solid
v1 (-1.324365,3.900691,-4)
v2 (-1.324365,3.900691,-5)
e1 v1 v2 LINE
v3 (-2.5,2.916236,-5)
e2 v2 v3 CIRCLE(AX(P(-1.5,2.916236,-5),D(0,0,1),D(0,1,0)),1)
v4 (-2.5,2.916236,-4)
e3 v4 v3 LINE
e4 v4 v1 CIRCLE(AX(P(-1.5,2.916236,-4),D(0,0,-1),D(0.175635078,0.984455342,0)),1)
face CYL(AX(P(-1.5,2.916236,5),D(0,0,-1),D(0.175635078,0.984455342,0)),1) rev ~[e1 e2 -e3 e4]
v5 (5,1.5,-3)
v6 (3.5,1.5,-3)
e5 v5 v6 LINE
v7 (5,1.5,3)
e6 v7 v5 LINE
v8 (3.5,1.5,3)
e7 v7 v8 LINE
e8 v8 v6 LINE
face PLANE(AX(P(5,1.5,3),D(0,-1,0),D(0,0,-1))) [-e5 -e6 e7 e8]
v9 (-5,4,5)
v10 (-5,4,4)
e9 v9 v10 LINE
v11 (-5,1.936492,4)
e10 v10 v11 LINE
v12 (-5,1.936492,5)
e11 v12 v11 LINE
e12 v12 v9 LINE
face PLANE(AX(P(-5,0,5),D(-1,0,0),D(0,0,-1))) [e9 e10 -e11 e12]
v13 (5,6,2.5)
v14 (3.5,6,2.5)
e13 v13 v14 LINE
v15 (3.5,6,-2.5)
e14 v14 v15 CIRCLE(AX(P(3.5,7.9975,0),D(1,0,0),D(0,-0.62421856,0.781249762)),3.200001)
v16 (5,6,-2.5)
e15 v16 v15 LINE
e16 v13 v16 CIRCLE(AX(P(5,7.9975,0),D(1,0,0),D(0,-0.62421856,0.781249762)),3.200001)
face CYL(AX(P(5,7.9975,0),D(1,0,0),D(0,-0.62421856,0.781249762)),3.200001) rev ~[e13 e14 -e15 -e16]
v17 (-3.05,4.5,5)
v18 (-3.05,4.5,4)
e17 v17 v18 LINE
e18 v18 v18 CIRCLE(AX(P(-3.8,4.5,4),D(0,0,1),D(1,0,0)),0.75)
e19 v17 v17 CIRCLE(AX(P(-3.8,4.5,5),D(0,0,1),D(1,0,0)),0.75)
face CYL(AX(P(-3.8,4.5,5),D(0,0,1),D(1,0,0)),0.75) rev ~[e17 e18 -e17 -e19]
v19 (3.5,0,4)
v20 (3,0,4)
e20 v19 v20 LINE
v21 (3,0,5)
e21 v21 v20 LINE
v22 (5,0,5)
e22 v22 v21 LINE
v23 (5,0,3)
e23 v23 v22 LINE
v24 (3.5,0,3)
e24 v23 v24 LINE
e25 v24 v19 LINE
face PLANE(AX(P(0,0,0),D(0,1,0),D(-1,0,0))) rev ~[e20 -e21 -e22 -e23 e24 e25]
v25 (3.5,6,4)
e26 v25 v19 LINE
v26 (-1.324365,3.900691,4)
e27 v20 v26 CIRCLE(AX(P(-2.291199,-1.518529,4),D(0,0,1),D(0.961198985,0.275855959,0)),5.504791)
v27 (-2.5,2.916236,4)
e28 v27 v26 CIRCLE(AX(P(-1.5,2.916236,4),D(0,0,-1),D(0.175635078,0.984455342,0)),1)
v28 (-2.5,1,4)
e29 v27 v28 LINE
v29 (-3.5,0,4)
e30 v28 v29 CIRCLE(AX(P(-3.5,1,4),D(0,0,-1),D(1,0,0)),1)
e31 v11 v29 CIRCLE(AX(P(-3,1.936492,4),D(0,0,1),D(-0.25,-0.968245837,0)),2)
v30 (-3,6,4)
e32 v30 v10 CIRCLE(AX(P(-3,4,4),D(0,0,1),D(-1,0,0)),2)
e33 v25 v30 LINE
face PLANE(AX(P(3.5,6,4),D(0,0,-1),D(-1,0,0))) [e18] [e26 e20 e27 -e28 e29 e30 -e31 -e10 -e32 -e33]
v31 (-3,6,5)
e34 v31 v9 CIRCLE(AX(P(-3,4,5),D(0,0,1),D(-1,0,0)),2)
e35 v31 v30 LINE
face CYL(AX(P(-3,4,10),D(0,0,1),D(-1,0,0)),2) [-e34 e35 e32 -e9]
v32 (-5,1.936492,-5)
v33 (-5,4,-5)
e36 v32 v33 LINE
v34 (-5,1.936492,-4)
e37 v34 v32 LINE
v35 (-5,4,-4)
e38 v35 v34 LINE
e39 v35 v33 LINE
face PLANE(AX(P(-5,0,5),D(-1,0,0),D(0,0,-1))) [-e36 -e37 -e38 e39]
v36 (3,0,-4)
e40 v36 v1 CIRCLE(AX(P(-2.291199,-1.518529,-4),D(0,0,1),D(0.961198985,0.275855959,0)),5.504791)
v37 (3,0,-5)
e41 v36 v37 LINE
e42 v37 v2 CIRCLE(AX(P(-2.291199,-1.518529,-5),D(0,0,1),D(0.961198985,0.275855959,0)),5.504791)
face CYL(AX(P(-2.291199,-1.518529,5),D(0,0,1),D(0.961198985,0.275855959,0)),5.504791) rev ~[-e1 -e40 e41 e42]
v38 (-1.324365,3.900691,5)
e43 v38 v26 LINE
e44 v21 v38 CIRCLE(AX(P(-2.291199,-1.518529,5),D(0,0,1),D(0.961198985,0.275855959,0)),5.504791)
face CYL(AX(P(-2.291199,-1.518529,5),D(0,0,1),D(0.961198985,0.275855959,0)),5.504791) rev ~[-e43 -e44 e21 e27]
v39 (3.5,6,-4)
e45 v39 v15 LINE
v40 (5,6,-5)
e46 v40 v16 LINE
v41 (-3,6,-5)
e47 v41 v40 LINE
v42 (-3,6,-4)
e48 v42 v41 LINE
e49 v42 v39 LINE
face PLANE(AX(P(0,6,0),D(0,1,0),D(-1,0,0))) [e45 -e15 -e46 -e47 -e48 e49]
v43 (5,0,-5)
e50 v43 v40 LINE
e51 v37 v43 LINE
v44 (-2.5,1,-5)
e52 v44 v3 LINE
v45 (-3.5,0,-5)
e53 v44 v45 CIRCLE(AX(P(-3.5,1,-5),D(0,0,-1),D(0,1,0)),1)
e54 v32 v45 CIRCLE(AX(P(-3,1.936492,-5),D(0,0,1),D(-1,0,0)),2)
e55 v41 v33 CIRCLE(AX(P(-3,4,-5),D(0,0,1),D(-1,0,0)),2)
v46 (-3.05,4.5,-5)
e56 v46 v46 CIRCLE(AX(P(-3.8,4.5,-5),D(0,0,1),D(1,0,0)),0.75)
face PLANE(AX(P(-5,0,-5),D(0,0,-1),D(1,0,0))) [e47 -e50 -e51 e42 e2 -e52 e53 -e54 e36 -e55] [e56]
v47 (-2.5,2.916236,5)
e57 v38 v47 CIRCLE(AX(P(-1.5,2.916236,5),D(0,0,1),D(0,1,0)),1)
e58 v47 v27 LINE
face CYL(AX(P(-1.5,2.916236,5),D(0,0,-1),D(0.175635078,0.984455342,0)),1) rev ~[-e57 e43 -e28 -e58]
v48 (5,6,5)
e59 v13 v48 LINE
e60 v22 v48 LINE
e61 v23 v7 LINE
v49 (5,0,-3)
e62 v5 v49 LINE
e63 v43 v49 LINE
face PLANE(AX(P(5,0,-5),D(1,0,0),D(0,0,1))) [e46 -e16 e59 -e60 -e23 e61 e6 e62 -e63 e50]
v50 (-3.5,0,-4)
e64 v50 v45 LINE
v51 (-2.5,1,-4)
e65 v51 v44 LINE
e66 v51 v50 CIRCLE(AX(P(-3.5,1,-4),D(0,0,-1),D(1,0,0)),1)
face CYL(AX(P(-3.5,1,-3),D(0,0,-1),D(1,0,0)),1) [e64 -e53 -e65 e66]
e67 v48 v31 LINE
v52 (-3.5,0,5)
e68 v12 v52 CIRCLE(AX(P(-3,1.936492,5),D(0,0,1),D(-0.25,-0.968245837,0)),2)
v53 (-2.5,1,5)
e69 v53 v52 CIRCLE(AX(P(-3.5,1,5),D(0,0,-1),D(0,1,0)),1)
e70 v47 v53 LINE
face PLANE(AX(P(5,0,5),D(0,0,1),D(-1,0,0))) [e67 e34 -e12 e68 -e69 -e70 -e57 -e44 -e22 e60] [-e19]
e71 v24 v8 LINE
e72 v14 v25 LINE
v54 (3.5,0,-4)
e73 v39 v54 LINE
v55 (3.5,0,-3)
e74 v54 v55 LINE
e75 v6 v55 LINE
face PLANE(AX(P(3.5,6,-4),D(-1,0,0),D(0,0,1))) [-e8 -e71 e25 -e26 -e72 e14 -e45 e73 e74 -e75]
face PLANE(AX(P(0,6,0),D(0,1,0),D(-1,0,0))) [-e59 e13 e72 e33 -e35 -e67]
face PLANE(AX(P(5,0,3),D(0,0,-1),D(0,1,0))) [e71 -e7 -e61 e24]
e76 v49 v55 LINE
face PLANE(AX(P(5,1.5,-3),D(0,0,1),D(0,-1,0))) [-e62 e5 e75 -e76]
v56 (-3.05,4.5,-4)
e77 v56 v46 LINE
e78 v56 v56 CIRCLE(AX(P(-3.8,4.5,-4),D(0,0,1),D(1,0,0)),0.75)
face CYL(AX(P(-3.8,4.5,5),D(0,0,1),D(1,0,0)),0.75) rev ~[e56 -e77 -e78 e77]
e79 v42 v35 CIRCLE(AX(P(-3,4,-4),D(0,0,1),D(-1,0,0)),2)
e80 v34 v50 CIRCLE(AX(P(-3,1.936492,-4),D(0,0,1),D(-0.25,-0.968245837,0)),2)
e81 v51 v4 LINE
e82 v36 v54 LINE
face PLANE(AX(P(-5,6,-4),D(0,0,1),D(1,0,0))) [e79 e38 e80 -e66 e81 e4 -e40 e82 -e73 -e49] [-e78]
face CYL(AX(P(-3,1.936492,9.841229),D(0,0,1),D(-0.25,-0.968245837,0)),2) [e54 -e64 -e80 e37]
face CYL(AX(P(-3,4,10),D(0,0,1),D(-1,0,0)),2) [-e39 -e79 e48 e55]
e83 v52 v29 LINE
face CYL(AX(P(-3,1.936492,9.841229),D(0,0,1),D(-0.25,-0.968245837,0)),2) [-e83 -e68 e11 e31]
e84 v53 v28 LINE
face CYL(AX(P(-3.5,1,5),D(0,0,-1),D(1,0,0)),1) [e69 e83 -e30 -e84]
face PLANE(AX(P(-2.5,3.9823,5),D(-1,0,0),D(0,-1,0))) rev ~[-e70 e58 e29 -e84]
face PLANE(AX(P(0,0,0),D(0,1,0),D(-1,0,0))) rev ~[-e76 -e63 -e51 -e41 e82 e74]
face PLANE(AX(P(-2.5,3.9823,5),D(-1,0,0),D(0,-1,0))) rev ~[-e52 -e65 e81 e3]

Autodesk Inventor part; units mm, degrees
ref_plane "YZ Plane" through (0, 0, 0) normal (1, 0, 0) x (0, 1, 0)
ref_plane "XZ Plane" through (0, 0, 0) normal (0, 1, 0) x (-1, 0, 0)
ref_plane "XY Plane" through (0, 0, 0) normal (0, 0, 1) x (1, 0, 0)
sketch "Esboço1" plane through (0, 0, 0) normal (0, 1, 0) x (-1, 0, 0)
  line L0 (-5, 5) -> (5, 5)
  line L1 (5, 5) -> (5, -5)
  line L2 (5, -5) -> (-5, -5)
  line L3 (-5, -5) -> (-5, 5)
  line L4 (-5, 5) -> (5, -5) construction
  line L5 (5, 5) -> (-5, -5) construction
  point P0 (0, 0)
  dimension "d0" = 10
  dimension "d1" = 10
extrude "Extrusão1" add sketch "Esboço1" along normal blind 6
sketch "Esboço2" plane through (5, 0, 5) normal (1, 0, 0) x (0, 0, -1)
  line L0 (2, 0) -> (2, 1.5)
  line L1 (0, 0) -> (0, 6) projected
  line L2 (2, 1.5) -> (8, 1.5)
  line L3 (8, 1.5) -> (8, 0)
  line L4 (10, 0) -> (10, 6) projected
  line L5 (0, 0) -> (10, 0) projected
  point P0 (5, 0)
  dimension "d4" = 2
  dimension "d5" = 1.5
  dimension "d6" = 2
  dimension "d7" = 1.5
extrude "Extrusão2" cut sketch "Esboço2" against normal through all
sketch "Esboço3" plane through (-5, 0, 5) normal (0, 0, 1) x (1, 0, 0)
  line L0 (10, 0) -> (0, 0) projected
  arc A0 (8, 0) -> (2.5, 3.9823) centre (2.7087, -1.5186) ccw
  line L1 (0, 0) -> (0, 6) projected
  line L2 (2.5, 3.9823) -> (2.5, 0)
  point P0 (5, 0)
  dimension "d10" = 2
  dimension "d11" = 2.5
  dimension "d12" = 5.5049
  dimension "d13" = 2.7087
extrude "Extrusão3" cut sketch "Esboço3" against normal through all
sketch "Esboço4" plane through (-5, 6, 5) normal (0, 0, 1) x (1, 0, 0)
  point P0 (5, -6)
fillet "Arredondamento1" radius 1 1 edges at (-2.5, 3.9823, 0)
fillet "Arredondamento2" radius 1 2 edges at (-2.5, 0, 4) (-2.5, 0, -4)
fillet "Arredondamento3" radius 2 3 edges at (-5, 6, 0) (-5, 0, -4) (-5, 0, 4)
sketch "Esboço5" plane through (5, 0, 5) normal (0, 0, 1) x (1, 0, 0)
  circle A0 centre (-8.8, 4.5) radius 0.75
  line L0 (0, 0) -> (0, 6) projected
  point P0 (-5, 0)
  dimension "d19" = 1.5
  dimension "d20" = 8.8
  dimension "d21" = 4.5
extrude "Extrusão4" cut sketch "Esboço5" against normal through all
sketch "Esboço6" plane through (0, 6, 0) normal (0, 1, 0) x (1, 0, 0)
  line L0 (-5, 5) -> (-5, -5) projected
  line L1 (-5, 4) -> (3.5, 4)
  line L2 (5, -5) -> (5, 5) projected
  line L3 (3.5, -4) -> (-5, -4)
  line L4 (-5, -4) -> (-5, 4)
  line L5 (5, 5) -> (-3, 5) projected
  line L6 (-3, -5) -> (5, -5) projected
  line L7 (3.5, 4) -> (3.5, -4)
  point P0 (0, 0)
  dimension "d24" = 1
  dimension "d25" = 1
  dimension "d26" = 1.5
extrude "Extrusão5" cut sketch "Esboço6" against normal through all
sketch "Esboço7" plane through (5, 0, -5) normal (1, 0, 0) x (0, 0, -1)
  line L0 (-1, 6) -> (-9, 6) projected
  arc A0 (-7.5, 6) -> (-2.5, 6) centre (-5, 7.9975) ccw
  line L1 (-10, 0) -> (-10, 6) projected
  line L2 (0, 0) -> (0, 6) projected
  point P0 (-5, 0)
  dimension "d29" = 3.2
  dimension "d30" = 2.5
  dimension "d31" = 2.5
extrude "Extrusão6" cut sketch "Esboço7" against normal blind 6
properties material "Liga de Nickel-Copper 400"
